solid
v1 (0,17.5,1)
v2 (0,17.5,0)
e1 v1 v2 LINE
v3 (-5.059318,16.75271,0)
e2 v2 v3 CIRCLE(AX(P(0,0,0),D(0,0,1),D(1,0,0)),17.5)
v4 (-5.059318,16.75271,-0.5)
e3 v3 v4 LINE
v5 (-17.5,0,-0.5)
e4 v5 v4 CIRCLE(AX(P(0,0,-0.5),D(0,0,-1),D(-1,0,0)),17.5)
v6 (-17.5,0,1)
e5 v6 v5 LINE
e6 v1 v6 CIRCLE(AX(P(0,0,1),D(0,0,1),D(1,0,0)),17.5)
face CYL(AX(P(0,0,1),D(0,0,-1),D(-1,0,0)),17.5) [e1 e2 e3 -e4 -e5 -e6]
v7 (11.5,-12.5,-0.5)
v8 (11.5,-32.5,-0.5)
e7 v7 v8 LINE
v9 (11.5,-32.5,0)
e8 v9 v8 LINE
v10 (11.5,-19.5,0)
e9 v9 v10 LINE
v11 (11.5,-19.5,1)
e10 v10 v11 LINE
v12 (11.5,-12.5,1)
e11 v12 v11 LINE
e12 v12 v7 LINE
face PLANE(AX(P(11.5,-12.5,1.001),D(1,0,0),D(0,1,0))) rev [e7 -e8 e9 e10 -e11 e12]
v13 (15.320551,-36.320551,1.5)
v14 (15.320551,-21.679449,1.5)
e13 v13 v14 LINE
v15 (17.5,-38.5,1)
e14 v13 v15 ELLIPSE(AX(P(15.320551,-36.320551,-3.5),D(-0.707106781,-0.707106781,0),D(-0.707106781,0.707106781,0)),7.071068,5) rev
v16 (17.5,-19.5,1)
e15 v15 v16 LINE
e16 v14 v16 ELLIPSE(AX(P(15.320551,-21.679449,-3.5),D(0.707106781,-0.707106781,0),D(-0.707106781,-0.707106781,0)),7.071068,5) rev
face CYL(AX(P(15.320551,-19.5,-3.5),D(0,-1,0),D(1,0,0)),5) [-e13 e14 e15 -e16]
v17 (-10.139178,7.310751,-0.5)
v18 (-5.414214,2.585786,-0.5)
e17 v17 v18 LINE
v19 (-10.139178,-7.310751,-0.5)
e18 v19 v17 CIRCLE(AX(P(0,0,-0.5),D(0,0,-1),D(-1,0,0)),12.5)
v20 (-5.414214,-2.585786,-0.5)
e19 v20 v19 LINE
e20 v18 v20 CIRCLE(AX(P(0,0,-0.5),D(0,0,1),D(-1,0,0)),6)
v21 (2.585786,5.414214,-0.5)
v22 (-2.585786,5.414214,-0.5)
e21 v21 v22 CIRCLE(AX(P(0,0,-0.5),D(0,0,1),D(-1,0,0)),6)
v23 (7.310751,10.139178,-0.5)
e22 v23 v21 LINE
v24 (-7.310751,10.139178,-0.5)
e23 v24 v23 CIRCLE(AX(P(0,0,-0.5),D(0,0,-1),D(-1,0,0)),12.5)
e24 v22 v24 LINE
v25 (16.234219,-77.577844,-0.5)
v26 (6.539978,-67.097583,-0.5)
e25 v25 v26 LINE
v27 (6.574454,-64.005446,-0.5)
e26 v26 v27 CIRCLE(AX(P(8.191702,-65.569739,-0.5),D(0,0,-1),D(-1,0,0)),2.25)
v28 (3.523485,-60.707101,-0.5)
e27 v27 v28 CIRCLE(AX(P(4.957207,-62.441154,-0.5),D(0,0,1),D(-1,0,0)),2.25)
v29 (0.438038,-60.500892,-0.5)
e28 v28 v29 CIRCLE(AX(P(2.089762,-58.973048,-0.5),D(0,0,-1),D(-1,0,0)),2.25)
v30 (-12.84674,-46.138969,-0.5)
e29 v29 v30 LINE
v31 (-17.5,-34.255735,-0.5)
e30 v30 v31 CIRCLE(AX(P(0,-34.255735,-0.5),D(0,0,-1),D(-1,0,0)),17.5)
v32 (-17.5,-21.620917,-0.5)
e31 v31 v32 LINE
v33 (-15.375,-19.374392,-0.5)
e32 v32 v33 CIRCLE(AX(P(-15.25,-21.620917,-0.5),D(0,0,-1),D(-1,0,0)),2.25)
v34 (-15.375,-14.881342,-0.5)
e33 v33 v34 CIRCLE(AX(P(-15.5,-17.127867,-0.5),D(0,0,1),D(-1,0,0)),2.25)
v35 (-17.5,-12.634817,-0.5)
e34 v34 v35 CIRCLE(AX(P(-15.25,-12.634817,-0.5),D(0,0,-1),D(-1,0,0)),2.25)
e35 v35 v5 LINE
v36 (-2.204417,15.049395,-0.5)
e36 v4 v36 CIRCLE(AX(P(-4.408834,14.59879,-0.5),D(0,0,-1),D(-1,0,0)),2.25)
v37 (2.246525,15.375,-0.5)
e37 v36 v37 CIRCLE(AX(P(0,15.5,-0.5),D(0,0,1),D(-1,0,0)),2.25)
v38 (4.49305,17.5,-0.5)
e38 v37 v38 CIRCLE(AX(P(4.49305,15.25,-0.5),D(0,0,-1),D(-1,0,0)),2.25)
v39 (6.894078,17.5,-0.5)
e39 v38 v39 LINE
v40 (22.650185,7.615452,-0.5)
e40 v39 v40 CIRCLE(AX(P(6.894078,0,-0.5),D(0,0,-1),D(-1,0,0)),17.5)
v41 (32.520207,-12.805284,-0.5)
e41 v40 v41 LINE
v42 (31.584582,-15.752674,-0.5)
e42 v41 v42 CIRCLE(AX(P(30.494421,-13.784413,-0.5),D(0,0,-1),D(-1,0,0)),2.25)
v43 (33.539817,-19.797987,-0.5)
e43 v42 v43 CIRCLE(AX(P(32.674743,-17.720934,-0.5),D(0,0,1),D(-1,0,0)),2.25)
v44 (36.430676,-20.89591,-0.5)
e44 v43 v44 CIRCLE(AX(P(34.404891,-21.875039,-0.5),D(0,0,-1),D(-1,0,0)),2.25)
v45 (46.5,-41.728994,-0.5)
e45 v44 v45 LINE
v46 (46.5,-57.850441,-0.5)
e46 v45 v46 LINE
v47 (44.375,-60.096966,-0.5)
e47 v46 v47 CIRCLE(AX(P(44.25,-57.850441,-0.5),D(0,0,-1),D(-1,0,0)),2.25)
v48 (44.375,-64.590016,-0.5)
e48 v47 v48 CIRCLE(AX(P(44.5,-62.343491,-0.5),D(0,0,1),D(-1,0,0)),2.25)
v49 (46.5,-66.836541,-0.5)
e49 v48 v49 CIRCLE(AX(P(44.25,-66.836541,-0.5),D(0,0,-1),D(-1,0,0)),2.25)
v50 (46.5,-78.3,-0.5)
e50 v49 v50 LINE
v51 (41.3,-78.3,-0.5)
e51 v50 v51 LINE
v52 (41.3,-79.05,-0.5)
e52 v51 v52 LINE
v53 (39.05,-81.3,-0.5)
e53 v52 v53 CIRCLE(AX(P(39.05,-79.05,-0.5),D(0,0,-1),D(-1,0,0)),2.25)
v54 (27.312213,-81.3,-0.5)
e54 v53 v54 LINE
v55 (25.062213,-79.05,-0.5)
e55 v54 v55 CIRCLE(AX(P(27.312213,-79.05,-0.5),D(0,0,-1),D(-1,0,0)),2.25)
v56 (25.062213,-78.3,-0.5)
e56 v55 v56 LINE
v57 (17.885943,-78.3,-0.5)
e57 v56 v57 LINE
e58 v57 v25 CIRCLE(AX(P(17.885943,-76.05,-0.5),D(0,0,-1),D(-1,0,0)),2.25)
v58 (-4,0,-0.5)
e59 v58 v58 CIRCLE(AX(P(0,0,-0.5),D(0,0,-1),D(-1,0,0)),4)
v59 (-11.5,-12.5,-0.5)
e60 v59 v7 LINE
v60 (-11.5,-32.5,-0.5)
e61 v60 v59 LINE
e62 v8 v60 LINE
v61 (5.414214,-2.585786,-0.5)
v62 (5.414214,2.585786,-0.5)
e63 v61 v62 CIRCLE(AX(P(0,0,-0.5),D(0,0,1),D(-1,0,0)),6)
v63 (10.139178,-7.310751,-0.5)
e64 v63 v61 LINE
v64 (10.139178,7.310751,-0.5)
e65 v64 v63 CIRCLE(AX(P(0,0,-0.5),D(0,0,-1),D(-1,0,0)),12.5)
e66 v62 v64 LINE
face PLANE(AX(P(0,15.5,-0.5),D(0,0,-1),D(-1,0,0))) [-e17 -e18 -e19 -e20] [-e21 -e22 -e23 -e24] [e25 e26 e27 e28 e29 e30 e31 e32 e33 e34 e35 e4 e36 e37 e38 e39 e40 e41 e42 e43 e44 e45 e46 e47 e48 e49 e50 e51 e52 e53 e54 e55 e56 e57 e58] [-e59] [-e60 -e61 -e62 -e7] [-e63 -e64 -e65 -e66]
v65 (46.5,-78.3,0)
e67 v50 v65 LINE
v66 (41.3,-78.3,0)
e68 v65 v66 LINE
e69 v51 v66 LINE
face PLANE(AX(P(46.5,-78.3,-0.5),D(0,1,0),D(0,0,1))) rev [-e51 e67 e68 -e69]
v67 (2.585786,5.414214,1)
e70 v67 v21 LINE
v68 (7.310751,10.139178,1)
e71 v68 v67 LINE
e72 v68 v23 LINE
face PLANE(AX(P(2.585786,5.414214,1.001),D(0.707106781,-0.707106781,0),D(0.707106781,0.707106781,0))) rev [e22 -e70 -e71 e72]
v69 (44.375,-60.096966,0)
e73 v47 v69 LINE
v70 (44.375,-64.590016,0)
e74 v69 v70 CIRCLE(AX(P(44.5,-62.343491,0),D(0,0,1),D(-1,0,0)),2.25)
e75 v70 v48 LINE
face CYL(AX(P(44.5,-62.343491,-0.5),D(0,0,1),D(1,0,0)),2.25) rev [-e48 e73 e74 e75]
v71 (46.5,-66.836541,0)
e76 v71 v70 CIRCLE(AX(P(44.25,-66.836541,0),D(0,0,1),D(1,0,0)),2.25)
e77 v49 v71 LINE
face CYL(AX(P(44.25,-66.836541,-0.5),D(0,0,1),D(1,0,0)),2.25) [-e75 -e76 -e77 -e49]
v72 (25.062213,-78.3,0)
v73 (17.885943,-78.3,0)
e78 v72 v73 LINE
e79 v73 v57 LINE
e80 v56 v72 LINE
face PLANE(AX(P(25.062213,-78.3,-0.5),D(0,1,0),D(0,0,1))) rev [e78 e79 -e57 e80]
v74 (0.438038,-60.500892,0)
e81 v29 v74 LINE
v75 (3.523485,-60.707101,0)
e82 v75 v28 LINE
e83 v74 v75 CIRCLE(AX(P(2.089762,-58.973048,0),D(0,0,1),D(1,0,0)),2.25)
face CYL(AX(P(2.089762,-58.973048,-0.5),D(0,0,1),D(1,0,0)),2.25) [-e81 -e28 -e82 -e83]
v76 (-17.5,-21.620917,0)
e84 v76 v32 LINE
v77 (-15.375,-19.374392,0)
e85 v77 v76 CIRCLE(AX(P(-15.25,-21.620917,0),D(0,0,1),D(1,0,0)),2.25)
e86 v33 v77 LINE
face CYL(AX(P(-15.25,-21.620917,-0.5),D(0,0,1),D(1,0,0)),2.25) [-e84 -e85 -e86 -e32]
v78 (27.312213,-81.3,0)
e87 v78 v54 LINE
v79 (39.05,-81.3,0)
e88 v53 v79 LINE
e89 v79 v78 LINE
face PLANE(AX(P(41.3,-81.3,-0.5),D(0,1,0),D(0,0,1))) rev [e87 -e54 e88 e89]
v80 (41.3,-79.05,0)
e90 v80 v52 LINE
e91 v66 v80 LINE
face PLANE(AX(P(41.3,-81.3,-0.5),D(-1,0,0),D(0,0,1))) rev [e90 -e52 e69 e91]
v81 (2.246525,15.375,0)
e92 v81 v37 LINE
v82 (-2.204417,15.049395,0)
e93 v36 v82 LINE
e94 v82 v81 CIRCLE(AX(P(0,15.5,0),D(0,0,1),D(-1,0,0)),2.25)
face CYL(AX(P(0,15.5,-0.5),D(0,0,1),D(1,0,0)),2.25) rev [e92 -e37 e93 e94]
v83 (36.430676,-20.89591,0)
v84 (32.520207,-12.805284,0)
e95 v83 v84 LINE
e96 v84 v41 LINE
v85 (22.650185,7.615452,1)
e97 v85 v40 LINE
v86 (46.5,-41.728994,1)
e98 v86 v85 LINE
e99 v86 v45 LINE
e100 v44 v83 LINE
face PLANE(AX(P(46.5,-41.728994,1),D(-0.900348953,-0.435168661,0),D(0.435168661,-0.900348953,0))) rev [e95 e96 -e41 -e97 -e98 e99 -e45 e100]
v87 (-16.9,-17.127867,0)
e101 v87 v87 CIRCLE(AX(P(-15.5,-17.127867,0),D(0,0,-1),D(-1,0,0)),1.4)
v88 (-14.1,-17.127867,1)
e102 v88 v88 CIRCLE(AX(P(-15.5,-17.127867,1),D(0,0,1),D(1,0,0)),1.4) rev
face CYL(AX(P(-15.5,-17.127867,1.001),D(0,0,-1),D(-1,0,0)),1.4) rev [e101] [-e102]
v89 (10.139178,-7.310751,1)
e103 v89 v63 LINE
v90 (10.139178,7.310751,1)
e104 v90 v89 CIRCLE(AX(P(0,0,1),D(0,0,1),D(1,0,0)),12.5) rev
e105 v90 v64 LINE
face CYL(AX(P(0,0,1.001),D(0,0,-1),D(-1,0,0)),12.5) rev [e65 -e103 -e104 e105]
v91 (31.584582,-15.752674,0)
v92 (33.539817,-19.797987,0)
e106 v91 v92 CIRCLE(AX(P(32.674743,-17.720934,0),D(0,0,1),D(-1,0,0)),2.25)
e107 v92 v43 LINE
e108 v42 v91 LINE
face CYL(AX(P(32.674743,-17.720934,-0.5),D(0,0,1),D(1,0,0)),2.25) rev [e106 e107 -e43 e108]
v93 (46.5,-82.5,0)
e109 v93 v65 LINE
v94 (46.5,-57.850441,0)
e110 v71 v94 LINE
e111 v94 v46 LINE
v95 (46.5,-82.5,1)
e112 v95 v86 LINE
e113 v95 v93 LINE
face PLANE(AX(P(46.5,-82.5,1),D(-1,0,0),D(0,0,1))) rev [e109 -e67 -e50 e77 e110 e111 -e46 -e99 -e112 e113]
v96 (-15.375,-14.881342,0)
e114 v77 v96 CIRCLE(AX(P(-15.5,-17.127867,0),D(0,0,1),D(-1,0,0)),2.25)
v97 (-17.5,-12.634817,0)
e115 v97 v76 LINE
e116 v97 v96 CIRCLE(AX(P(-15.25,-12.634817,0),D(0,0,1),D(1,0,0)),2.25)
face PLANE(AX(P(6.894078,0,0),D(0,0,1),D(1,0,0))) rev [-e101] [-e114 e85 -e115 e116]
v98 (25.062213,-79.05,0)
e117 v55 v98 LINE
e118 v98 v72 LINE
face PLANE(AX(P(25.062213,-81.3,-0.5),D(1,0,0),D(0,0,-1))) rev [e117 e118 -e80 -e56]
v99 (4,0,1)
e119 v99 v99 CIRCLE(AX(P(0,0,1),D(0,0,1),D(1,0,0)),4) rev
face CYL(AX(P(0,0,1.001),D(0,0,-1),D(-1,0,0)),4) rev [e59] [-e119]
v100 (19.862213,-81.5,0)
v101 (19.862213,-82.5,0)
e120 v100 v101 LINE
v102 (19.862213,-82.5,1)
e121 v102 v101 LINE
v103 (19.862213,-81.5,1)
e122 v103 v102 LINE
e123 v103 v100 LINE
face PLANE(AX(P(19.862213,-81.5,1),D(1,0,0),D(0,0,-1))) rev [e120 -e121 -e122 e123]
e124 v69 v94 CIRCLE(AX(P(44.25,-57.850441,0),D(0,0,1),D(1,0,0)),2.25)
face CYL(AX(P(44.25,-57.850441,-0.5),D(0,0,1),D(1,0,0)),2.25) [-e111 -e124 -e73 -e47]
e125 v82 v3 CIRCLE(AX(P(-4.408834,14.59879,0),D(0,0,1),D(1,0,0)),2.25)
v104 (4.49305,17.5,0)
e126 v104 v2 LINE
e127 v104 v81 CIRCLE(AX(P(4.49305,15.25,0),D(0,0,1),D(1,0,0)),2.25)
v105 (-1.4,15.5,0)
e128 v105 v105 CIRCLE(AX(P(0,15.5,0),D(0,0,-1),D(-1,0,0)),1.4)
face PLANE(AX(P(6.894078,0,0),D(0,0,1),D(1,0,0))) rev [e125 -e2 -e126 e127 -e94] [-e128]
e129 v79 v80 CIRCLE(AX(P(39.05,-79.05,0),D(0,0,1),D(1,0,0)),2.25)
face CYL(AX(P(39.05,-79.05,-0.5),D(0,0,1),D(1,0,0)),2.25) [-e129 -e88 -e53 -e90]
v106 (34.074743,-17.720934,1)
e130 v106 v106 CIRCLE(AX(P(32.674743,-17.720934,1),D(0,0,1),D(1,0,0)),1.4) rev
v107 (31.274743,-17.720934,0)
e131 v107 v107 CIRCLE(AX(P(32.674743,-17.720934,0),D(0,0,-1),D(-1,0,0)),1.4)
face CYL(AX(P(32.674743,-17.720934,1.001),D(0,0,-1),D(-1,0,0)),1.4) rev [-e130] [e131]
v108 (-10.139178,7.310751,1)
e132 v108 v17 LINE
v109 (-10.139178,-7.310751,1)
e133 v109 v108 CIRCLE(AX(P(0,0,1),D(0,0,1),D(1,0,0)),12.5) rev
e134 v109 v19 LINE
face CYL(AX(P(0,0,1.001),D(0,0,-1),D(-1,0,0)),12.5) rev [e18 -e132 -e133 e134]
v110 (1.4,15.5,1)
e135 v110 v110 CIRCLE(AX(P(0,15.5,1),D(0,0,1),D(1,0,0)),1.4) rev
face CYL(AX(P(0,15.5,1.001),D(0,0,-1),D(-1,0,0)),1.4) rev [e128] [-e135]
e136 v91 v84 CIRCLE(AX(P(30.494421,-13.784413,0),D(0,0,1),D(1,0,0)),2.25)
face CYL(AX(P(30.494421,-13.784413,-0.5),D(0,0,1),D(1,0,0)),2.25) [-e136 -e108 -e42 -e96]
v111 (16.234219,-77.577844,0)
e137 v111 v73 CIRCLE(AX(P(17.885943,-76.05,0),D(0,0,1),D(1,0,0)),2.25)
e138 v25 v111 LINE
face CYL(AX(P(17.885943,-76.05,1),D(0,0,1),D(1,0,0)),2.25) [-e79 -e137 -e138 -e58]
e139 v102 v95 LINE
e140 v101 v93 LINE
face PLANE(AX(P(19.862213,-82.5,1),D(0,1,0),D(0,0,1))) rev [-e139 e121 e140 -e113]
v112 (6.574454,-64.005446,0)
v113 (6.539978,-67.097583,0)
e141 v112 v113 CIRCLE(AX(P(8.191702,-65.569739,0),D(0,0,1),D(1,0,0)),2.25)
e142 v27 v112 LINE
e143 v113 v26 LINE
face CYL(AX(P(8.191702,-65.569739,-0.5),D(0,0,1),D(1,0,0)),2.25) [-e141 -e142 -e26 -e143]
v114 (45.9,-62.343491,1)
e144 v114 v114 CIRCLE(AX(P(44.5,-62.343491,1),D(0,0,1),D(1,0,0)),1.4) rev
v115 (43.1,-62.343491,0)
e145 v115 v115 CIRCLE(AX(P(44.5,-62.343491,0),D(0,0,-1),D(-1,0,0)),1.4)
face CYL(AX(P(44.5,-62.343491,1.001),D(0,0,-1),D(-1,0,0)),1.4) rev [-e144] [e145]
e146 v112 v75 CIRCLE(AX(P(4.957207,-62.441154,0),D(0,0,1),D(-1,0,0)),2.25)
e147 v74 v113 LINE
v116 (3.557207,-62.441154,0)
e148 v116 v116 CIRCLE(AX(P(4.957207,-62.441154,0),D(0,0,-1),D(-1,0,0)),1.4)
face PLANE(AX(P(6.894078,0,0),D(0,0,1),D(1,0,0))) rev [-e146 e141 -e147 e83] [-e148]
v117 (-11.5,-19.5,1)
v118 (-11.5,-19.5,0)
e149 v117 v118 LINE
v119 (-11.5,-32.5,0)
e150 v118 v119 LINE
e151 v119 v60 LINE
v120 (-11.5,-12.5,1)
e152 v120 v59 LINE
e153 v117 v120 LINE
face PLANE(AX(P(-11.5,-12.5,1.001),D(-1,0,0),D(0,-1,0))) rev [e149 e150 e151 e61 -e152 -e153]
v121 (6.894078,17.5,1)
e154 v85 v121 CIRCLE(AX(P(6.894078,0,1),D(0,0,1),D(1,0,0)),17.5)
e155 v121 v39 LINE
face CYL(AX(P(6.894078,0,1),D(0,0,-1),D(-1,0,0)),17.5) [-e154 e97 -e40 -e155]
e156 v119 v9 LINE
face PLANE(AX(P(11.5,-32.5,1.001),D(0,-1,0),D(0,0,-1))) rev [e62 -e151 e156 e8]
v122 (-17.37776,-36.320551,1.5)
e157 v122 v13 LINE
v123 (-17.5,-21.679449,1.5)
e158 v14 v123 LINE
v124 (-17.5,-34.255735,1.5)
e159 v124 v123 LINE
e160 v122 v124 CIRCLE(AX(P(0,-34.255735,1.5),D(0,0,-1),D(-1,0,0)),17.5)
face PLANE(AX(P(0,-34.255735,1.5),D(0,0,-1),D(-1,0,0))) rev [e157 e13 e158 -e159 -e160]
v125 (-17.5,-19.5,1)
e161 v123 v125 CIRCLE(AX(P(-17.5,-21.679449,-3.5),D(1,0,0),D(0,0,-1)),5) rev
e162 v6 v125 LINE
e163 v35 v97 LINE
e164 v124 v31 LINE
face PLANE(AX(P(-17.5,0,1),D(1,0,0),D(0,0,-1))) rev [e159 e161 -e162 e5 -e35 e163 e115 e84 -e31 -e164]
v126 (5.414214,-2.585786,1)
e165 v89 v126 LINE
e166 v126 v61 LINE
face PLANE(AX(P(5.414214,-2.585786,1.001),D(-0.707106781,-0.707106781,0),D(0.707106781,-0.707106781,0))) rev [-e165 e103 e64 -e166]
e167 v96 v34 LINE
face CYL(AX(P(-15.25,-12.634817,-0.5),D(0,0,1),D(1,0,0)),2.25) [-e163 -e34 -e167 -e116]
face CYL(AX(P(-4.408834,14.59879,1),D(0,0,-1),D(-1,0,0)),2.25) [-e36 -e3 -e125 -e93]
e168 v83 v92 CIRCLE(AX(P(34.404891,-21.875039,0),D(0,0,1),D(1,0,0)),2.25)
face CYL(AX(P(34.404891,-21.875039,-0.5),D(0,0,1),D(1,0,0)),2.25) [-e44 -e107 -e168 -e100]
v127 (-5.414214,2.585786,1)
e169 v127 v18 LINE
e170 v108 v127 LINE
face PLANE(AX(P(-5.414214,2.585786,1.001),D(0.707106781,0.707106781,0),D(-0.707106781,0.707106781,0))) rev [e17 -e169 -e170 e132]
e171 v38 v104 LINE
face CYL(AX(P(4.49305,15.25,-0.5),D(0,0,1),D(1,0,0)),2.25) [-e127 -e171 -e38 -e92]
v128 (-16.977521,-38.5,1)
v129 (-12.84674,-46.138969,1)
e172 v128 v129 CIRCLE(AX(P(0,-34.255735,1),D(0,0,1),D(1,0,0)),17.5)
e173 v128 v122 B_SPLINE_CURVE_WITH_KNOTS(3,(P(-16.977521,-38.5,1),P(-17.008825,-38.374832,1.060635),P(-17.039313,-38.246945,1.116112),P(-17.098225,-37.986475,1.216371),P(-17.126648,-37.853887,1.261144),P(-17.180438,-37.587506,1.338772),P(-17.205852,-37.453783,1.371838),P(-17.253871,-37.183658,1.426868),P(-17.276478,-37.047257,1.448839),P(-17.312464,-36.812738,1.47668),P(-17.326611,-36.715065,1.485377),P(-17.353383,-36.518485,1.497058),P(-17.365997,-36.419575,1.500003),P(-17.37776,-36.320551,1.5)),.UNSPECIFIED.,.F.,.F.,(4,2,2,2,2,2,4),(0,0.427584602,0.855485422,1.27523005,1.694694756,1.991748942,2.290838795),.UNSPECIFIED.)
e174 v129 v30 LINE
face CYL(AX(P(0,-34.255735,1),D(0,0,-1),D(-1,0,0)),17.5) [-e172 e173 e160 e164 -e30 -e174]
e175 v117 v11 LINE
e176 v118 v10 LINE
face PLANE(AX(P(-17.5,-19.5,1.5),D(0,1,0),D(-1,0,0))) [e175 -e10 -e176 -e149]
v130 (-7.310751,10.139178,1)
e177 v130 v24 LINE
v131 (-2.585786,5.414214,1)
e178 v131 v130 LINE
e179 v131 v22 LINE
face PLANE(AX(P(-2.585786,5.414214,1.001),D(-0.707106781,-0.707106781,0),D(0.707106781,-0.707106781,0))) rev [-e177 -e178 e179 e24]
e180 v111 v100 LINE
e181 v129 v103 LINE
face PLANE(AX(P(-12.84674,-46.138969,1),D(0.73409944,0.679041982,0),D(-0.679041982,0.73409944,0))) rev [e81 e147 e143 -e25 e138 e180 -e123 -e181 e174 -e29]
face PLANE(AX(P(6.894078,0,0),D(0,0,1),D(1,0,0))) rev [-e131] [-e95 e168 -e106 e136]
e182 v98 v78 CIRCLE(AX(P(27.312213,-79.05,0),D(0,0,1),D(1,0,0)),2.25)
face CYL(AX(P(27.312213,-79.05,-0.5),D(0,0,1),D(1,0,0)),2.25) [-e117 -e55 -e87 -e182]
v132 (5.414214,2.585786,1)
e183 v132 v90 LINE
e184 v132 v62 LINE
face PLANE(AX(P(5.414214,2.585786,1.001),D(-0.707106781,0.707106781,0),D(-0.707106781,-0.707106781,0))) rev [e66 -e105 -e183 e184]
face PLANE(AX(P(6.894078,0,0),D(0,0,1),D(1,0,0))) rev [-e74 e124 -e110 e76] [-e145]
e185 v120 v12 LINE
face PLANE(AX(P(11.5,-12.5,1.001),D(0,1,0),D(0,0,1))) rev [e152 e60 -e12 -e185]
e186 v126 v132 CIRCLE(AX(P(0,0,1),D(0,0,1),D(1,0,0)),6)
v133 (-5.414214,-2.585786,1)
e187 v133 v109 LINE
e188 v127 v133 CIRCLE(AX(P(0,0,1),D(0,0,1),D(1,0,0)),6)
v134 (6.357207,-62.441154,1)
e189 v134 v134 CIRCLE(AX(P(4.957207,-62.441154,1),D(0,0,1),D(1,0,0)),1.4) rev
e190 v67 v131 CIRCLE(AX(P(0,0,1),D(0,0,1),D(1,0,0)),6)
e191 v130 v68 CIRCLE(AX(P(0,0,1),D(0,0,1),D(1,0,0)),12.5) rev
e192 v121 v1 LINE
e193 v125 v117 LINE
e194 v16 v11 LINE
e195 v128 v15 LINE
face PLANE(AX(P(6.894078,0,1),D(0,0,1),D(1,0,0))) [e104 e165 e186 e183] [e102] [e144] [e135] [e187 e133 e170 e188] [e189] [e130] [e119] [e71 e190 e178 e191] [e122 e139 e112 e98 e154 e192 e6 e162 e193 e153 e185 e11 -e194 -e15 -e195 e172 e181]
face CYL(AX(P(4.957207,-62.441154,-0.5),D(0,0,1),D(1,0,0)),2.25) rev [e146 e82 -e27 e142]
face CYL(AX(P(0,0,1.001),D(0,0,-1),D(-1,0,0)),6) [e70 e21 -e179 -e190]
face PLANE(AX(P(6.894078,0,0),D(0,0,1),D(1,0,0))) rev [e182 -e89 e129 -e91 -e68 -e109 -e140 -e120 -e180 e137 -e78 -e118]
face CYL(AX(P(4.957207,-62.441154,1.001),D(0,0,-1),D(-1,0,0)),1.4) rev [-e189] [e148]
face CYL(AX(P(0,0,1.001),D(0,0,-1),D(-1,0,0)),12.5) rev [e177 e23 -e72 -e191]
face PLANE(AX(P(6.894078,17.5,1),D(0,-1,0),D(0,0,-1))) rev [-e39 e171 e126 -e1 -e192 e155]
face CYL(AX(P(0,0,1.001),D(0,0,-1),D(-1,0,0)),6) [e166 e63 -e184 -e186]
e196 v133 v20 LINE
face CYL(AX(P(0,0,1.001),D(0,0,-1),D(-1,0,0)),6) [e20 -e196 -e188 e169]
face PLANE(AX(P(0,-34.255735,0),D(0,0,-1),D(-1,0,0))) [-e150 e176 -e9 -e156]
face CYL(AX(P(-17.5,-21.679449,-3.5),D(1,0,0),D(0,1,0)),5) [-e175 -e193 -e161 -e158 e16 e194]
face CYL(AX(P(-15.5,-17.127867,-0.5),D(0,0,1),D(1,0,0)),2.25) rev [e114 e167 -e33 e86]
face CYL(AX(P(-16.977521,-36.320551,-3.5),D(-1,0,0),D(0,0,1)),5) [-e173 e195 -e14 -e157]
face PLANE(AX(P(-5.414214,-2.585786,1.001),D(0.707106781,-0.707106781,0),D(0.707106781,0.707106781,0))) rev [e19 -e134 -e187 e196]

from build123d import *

# Parameters (mm, degrees)
EXTRUDE_1_DEPTH     = 1
EXTRUDE_START       = 0.5
EXTRUDE_2_DEPTH     = 0.5
FILLET_1_R          = 2.25
CUT_EXTRUDE_1_REACH = 96.707
SKETCH_3_R          = 1.4
CUT_EXTRUDE_2_REACH = 96.714
SKETCH_4_R          = 4
SKETCH_4_W          = 23
SKETCH_4_H          = 20
EXTRUDE_3_DEPTH     = 1.5
FILLET_START        = -18
FILLET_2_DEPTH      = 35.5
FILLET_START_2      = -39
FILLET_2_2_DEPTH    = 20


with BuildPart() as part:
    # 스케치1 → 보스-돌출1 (new body)
    with BuildSketch(Plane.XY):
        with BuildLine():
            Line((46.5, -82.5), (46.5, -41.72899408))
            Line((46.5, -41.72899408), (22.650184607, 7.615451559))
            ThreePointArc((22.650184607, 7.615451559), (16.194067118, 14.824311152), (6.894077933, 17.5))
            Line((6.894077933, 17.5), (0, 17.5))
            ThreePointArc((0, 17.5), (-12.374368671, 12.374368671), (-17.5, 0))
            Line((-17.5, 0), (-17.5, -34.255734548))
            ThreePointArc((-17.5, -34.255734548), (-16.295213306, -40.636645401), (-12.846740193, -46.138969227))
            Line((-12.846740193, -46.138969227), (19.862213273, -81.5))
            Line((19.862213273, -81.5), (19.862213273, -82.5))
            Line((19.862213273, -82.5), (46.5, -82.5))
        make_face()
    extrude(amount=EXTRUDE_1_DEPTH)

    # 스케치2 → 보스-돌출2 (add)
    with BuildSketch(Plane(origin=(0, 0, 0), x_dir=(-1, 0, 0), z_dir=(0, 0, -1)).offset(EXTRUDE_START)):
        with BuildLine():
            Line((-41.3, -81.3), (-41.3, -78.3))
            Line((-41.3, -78.3), (-46.5, -78.3))
            Line((-46.5, -78.3), (-46.5, -64.59349112))
            Line((-46.5, -64.59349112), (-44.5, -64.59349112))
            ThreePointArc((-44.5, -64.59349112), (-42.25, -62.34349112), (-44.5, -60.09349112))
            Line((-44.5, -60.09349112), (-46.5, -60.09349112))
            Line((-46.5, -60.09349112), (-46.5, -41.72899408))
            Line((-46.5, -41.72899408), (-35.454570743, -18.876381824))
            Line((-35.454570743, -18.876381824), (-33.653872837, -19.746719145))
            ThreePointArc((-33.653872837, -19.746719145), (-30.648958207, -18.700063487), (-31.695613865, -15.695148857))
            Line((-31.695613865, -15.695148857), (-33.49631177, -14.824811536))
            Line((-33.49631177, -14.824811536), (-22.650184607, 7.615451559))
            ThreePointArc((-22.650184607, 7.615451559), (-16.194067118, 14.824311152), (-6.894077933, 17.5))
            Line((-6.894077933, 17.5), (-2.25, 17.5))
            Line((-2.25, 17.5), (-2.25, 15.5))
            ThreePointArc((-2.25, 15.5), (0, 13.25), (2.25, 15.5))
            Line((2.25, 15.5), (2.25, 17.354754392))
            ThreePointArc((2.25, 17.354754392), (13.145816825, 11.551515052), (17.5, 0))
            Line((17.5, 0), (17.5, -14.877867274))
            Line((17.5, -14.877867274), (15.5, -14.877867274))
            ThreePointArc((15.5, -14.877867274), (13.25, -17.127867274), (15.5, -19.377867274))
            Line((15.5, -19.377867274), (17.5, -19.377867274))
            Line((17.5, -19.377867274), (17.5, -34.255734548))
            ThreePointArc((17.5, -34.255734548), (16.295213306, -40.636645401), (12.846740193, -46.138969227))
            Line((12.846740193, -46.138969227), (-1.961163732, -62.14751401))
            Line((-1.961163732, -62.14751401), (-3.429362611, -60.789430047))
            ThreePointArc((-3.429362611, -60.789430047), (-6.608930809, -60.913309328), (-6.485051529, -64.092877525))
            Line((-6.485051529, -64.092877525), (-5.016852649, -65.450961488))
            Line((-5.016852649, -65.450961488), (-16.902213273, -78.3))
            Line((-16.902213273, -78.3), (-25.062213273, -78.3))
            Line((-25.062213273, -78.3), (-25.062213273, -81.3))
            Line((-25.062213273, -81.3), (-41.3, -81.3))
        make_face()
    extrude(amount=-EXTRUDE_2_DEPTH)

    # 필렛1
    # the kernel refuses this fillet: 2.25 mm, written as the material it takes off along each edge
    with BuildSketch(Plane(origin=(16.902213273, -78.3, -2.959324658), x_dir=(1, 0, 0), z_dir=(0, 0, 1))) as fillet_1_piece_1:
        with BuildLine():
            CenterArc((FILLET_1_R * 0.437213272583, FILLET_1_R), FILLET_1_R, 222.768825392, 47.231174608)
            Line((-FILLET_1_R * 0.296886167004, FILLET_1_R * 0.320958018383), (0, 0))
            Line((0, 0), (FILLET_1_R * 0.437213272583, 0))
        make_face()
    extrude(amount=2.959324658, mode=Mode.SUBTRACT)
    with BuildSketch(Plane(origin=(41.3, -81.3, -6.125), x_dir=(0, 1, 0), z_dir=(0, 0, 1)), Plane(origin=(25.062213273, -81.3, -6.125), x_dir=(1, 0, 0), z_dir=(0, 0, 1))) as fillet_1_piece_2:
        with BuildLine():
            CenterArc((FILLET_1_R, FILLET_1_R), FILLET_1_R, 180, 90)
            Line((0, FILLET_1_R), (0, 0))
            Line((0, 0), (FILLET_1_R, 0))
        make_face()
    extrude(amount=6.125, mode=Mode.SUBTRACT)
    with BuildSketch(Plane(origin=(-17.5, -14.877867274, -6.107625472), x_dir=(0, 1, 0), z_dir=(0, 0, 1)), Plane(origin=(46.5, -64.59349112, -6.107625472), x_dir=(0, -1, 0), z_dir=(0, 0, 1)), Plane(origin=(1.961163732, -62.14751401, -6.107625472), x_dir=(-0.679041981617428, 0.7340994395864068, 0), z_dir=(0, 0, 1))) as fillet_1_piece_3:
        with BuildLine():
            CenterArc((2.243050189, -2.25), FILLET_1_R, 90, 86.815261463)
            Line((-0.003474906, -2.125), (-0.228127415, -2.1125))
            ThreePointArc((-0.228127415, -2.1125), (-0.225, -2), (-0.225, 0))
            Line((-0.225, 0), (0, 0.225))
            Line((0, 0.225), (2.243050189, 0.225))
            Line((2.243050189, 0.225), (2.243050189, 0))
        make_face()
    extrude(amount=6.107625472, mode=Mode.SUBTRACT)
    with BuildSketch(Plane(origin=(-17.5, -19.377867274, -6.107625472), x_dir=(0, -1, 0), z_dir=(0, 0, 1)), Plane(origin=(46.5, -60.09349112, -6.107625472), x_dir=(0, 1, 0), z_dir=(0, 0, 1)), Plane(origin=(5.016852649, -65.450961488, -6.107625472), x_dir=(0.6790419816174277, -0.7340994395864073, 0), z_dir=(0, 0, 1))) as fillet_1_piece_4:
        with BuildLine():
            CenterArc((2.243050189, 2.25), FILLET_1_R, 183.184738537, 86.815261463)
            Line((-0.003474906, 2.125), (-0.228127415, 2.1125))
            ThreePointArc((-0.228127415, 2.1125), (-0.225, 2), (-0.225, 0))
            Line((-0.225, 0), (0, -0.225))
            Line((0, -0.225), (2.243050189, -0.225))
            Line((2.243050189, -0.225), (2.243050189, 0))
        make_face()
    extrude(amount=6.107625472, mode=Mode.SUBTRACT)
    with BuildSketch(Plane(origin=(2.25, 17.5, -6.107625472), x_dir=(-0.0016352474835574222, -0.99999866298194, 0), z_dir=(0, 0, 1)), Plane(origin=(35.454570743, -18.876381824, -6.107625472), x_dir=(-0.901059357516204, -0.4336957853524583, 0), z_dir=(0, 0, 1))) as fillet_1_piece_5:
        with BuildLine():
            CenterArc((2.24632905, 2.246726497), FILLET_1_R, 180.093692821, 86.815261463)
            Line((-0.003667942, 2.24304719), (-0.228667641, 2.242679259))
            Line((-0.228667641, 2.242679259), (-0.224999699, -0.000367931))
            Line((-0.224999699, -0.000367931), (0.000367931, -0.224999699))
            ThreePointArc((0.000367931, -0.224999699), (2.000365257, -0.221729204), (2.11287022, -0.22467265))
            Line((2.11287022, -0.22467265), (2.125002841, 0))
        make_face()
    extrude(amount=6.107625472, mode=Mode.SUBTRACT)
    with BuildSketch(Plane(origin=(-2.25, 17.354754392, -7.682759743), x_dir=(-0.9777990320246813, -0.2095448710219276, 0), z_dir=(0, 0, 1))) as fillet_1_piece_6:
        with BuildLine():
            CenterArc((2.688404361, 2.242406315), FILLET_1_R, 179.456997301, 95.251636128)
            Line((0.438505404, 2.263729662), (0.213515509, 2.265861997))
            ThreePointArc((0.213515509, 2.265861997), (0.168649488, 1.860724645), (-0.220004782, 0.047147596))
            Line((-0.220004782, 0.047147596), (-0.018469954, -0.224240631))
            ThreePointArc((-0.018469954, -0.224240631), (1.436551949, -0.284061995), (2.891573851, -0.224240631))
            Line((2.891573851, -0.224240631), (2.873103897, 0))
        make_face()
    extrude(amount=7.682759743, mode=Mode.SUBTRACT)
    with BuildSketch(Plane(origin=(33.49631177, -14.824811536, -6.107625472), x_dir=(-0.8996361406020625, -0.43664037207137185, 0), z_dir=(0, 0, 1))) as fillet_1_piece_7:
        with BuildLine():
            CenterArc((2.24632905, -2.246726497), FILLET_1_R, 93.091045716, 86.815261463)
            Line((-0.003667942, -2.24304719), (-0.228667641, -2.242679259))
            Line((-0.228667641, -2.242679259), (-0.224999699, 0.000367931))
            Line((-0.224999699, 0.000367931), (0.000367931, 0.224999699))
            ThreePointArc((0.000367931, 0.224999699), (2.000365257, 0.221729204), (2.11287022, 0.22467265))
            Line((2.11287022, 0.22467265), (2.125002841, 0))
        make_face()
    extrude(amount=6.107625472, mode=Mode.SUBTRACT)

    # 스케치3 → 컷-돌출1 (cut, up to next)
    with BuildSketch(Plane(origin=(0, 0, 0), x_dir=(-1, 0, 0), z_dir=(0, 0, -1)), mode=Mode.PRIVATE) as cut_extrude_1_sk1:
        with Locations((0, 15.5)):
            Circle(SKETCH_3_R)
    cut_extrude_1_tool1 = extrude(cut_extrude_1_sk1.sketch, amount=-CUT_EXTRUDE_1_REACH, mode=Mode.PRIVATE) & part.part
    # 스케치3 → 컷-돌출1 (cut, up to next)
    with BuildSketch(Plane(origin=(0, 0, 0), x_dir=(-1, 0, 0), z_dir=(0, 0, -1)), mode=Mode.PRIVATE) as cut_extrude_1_sk2:
        with Locations((15.5, -17.127867274)):
            Circle(SKETCH_3_R)
    cut_extrude_1_tool2 = extrude(cut_extrude_1_sk2.sketch, amount=-CUT_EXTRUDE_1_REACH, mode=Mode.PRIVATE) & part.part
    # 스케치3 → 컷-돌출1 (cut, up to next)
    with BuildSketch(Plane(origin=(0, 0, 0), x_dir=(-1, 0, 0), z_dir=(0, 0, -1)), mode=Mode.PRIVATE) as cut_extrude_1_sk3:
        with Locations((-32.674743351, -17.720934001)):
            Circle(SKETCH_3_R)
    cut_extrude_1_tool3 = extrude(cut_extrude_1_sk3.sketch, amount=-CUT_EXTRUDE_1_REACH, mode=Mode.PRIVATE) & part.part
    # 스케치3 → 컷-돌출1 (cut, up to next)
    with BuildSketch(Plane(origin=(0, 0, 0), x_dir=(-1, 0, 0), z_dir=(0, 0, -1)), mode=Mode.PRIVATE) as cut_extrude_1_sk4:
        with Locations((-44.5, -62.34349112)):
            Circle(SKETCH_3_R)
    cut_extrude_1_tool4 = extrude(cut_extrude_1_sk4.sketch, amount=-CUT_EXTRUDE_1_REACH, mode=Mode.PRIVATE) & part.part
    # 스케치3 → 컷-돌출1 (cut, up to next)
    with BuildSketch(Plane(origin=(0, 0, 0), x_dir=(-1, 0, 0), z_dir=(0, 0, -1)), mode=Mode.PRIVATE) as cut_extrude_1_sk5:
        with Locations((-4.95720707, -62.441153786)):
            Circle(SKETCH_3_R)
    cut_extrude_1_tool5 = extrude(cut_extrude_1_sk5.sketch, amount=-CUT_EXTRUDE_1_REACH, mode=Mode.PRIVATE) & part.part
    add(cut_extrude_1_tool1.solids().sort_by_distance((0, 15.5, 0))[0], mode=Mode.SUBTRACT)
    add(cut_extrude_1_tool2.solids().sort_by_distance((-15.5, -17.127867, 0))[0], mode=Mode.SUBTRACT)
    add(cut_extrude_1_tool3.solids().sort_by_distance((32.674743, -17.720934, 0))[0], mode=Mode.SUBTRACT)
    add(cut_extrude_1_tool4.solids().sort_by_distance((44.5, -62.343491, 0))[0], mode=Mode.SUBTRACT)
    add(cut_extrude_1_tool5.solids().sort_by_distance((4.957207, -62.441154, 0))[0], mode=Mode.SUBTRACT)

    # 스케치4 → 컷-돌출2 (cut, up to next)
    with BuildSketch(Plane(origin=(0, 0, -0.5), x_dir=(-1, 0, 0), z_dir=(0, 0, -1)), mode=Mode.PRIVATE) as cut_extrude_2_sk1:
        Circle(SKETCH_4_R)
    cut_extrude_2_tool1 = extrude(cut_extrude_2_sk1.sketch, amount=-CUT_EXTRUDE_2_REACH, mode=Mode.PRIVATE) & part.part
    # 스케치4 → 컷-돌출2 (cut, up to next)
    with BuildSketch(Plane(origin=(0, 0, -0.5), x_dir=(-1, 0, 0), z_dir=(0, 0, -1)), mode=Mode.PRIVATE) as cut_extrude_2_sk2:
        with Locations((0, -22.5)):
            Rectangle(SKETCH_4_W, SKETCH_4_H)
    cut_extrude_2_tool2 = extrude(cut_extrude_2_sk2.sketch, amount=-CUT_EXTRUDE_2_REACH, mode=Mode.PRIVATE) & part.part
    # 스케치4 → 컷-돌출2 (cut, up to next)
    with BuildSketch(Plane(origin=(0, 0, -0.5), x_dir=(-1, 0, 0), z_dir=(0, 0, -1)), mode=Mode.PRIVATE) as cut_extrude_2_sk3:
        with BuildLine():
            Line((-5.414213562, -2.585786438), (-10.139177746, -7.310750621))
            ThreePointArc((-10.139177746, -7.310750621), (-12.5, 0), (-10.139177746, 7.310750621))
            Line((-10.139177746, 7.310750621), (-5.414213562, 2.585786438))
            ThreePointArc((-5.414213562, 2.585786438), (-6, 0), (-5.414213562, -2.585786438))
        make_face()
    cut_extrude_2_tool3 = extrude(cut_extrude_2_sk3.sketch, amount=-CUT_EXTRUDE_2_REACH, mode=Mode.PRIVATE) & part.part
    # 스케치4 → 컷-돌출2 (cut, up to next)
    with BuildSketch(Plane(origin=(0, 0, -0.5), x_dir=(-1, 0, 0), z_dir=(0, 0, -1)), mode=Mode.PRIVATE) as cut_extrude_2_sk4:
        with BuildLine():
            Line((5.414213562, -2.585786438), (10.139177746, -7.310750621))
            ThreePointArc((10.139177746, -7.310750621), (12.5, 0), (10.139177746, 7.310750621))
            Line((10.139177746, 7.310750621), (5.414213562, 2.585786438))
            ThreePointArc((5.414213562, 2.585786438), (6, 0), (5.414213562, -2.585786438))
        make_face()
    cut_extrude_2_tool4 = extrude(cut_extrude_2_sk4.sketch, amount=-CUT_EXTRUDE_2_REACH, mode=Mode.PRIVATE) & part.part
    # 스케치4 → 컷-돌출2 (cut, up to next)
    with BuildSketch(Plane(origin=(0, 0, -0.5), x_dir=(-1, 0, 0), z_dir=(0, 0, -1)), mode=Mode.PRIVATE) as cut_extrude_2_sk5:
        with BuildLine():
            Line((2.585786438, 5.414213562), (7.310750621, 10.139177746))
            ThreePointArc((7.310750621, 10.139177746), (0, 12.5), (-7.310750621, 10.139177746))
            Line((-7.310750621, 10.139177746), (-2.585786438, 5.414213562))
            ThreePointArc((-2.585786438, 5.414213562), (0, 6), (2.585786438, 5.414213562))
        make_face()
    cut_extrude_2_tool5 = extrude(cut_extrude_2_sk5.sketch, amount=-CUT_EXTRUDE_2_REACH, mode=Mode.PRIVATE) & part.part
    add(cut_extrude_2_tool1.solids().sort_by_distance((0, 0, -0.5))[0], mode=Mode.SUBTRACT)
    add(cut_extrude_2_tool2.solids().sort_by_distance((0, -22.5, -0.5))[0], mode=Mode.SUBTRACT)
    add(cut_extrude_2_tool3.solids().sort_by_distance((9.239512, 0, -0.5))[0], mode=Mode.SUBTRACT)
    add(cut_extrude_2_tool4.solids().sort_by_distance((-9.239512, 0, -0.5))[0], mode=Mode.SUBTRACT)
    add(cut_extrude_2_tool5.solids().sort_by_distance((0, 9.239512, -0.5))[0], mode=Mode.SUBTRACT)

    # 스케치6 → 보스-돌출3 (add)
    with BuildSketch(Plane(origin=(0, 0, 0), x_dir=(-1, 0, 0), z_dir=(0, 0, -1))):
        with BuildLine():
            Line((17.5, -19.5), (-17.5, -19.5))
            Line((-17.5, -19.5), (-17.5, -38.5))
            Line((-17.5, -38.5), (16.977520749, -38.5))
            ThreePointArc((16.977520749, -38.5), (17.368889042, -36.393886425), (17.5, -34.255734548))
            Line((17.5, -34.255734548), (17.5, -19.5))
        make_face()
    extrude(amount=-EXTRUDE_3_DEPTH)

    # 필렛2: read off the stored shape, not the designer's step
    # 필렛2 outline → 필렛2 (cut)
    with BuildSketch(Plane.YZ.offset(FILLET_START)):
        with BuildLine():
            Line((-38.5, 1.5), (-38.5, 1))
            ThreePointArc((-38.5, 1), (-37.438584517, 1.373397172), (-36.320550528, 1.5))
            Line((-36.320550528, 1.5), (-38.5, 1.5))
        make_face()
        with BuildLine():
            Line((-19.5, 1.5), (-21.679449472, 1.5))
            ThreePointArc((-21.679449472, 1.5), (-20.561415483, 1.373397172), (-19.5, 1))
            Line((-19.5, 1), (-19.5, 1.5))
        make_face()
    extrude(amount=FILLET_2_DEPTH, mode=Mode.SUBTRACT)

    # Fillet 2 2 outline → Fillet 2 2 (cut)
    with BuildSketch(Plane(origin=(0, 0, 0), x_dir=(1, 0, 0), z_dir=(0, 1, 0)).offset(FILLET_START_2)):
        with BuildLine():
            Line((17.5, -1.5), (17.5, -1))
            ThreePointArc((17.5, -1), (16.438584517, -1.373397172), (15.320550528, -1.5))
            Line((15.320550528, -1.5), (17.5, -1.5))
        make_face()
    extrude(amount=FILLET_2_2_DEPTH, mode=Mode.SUBTRACT)


solid = part.part
